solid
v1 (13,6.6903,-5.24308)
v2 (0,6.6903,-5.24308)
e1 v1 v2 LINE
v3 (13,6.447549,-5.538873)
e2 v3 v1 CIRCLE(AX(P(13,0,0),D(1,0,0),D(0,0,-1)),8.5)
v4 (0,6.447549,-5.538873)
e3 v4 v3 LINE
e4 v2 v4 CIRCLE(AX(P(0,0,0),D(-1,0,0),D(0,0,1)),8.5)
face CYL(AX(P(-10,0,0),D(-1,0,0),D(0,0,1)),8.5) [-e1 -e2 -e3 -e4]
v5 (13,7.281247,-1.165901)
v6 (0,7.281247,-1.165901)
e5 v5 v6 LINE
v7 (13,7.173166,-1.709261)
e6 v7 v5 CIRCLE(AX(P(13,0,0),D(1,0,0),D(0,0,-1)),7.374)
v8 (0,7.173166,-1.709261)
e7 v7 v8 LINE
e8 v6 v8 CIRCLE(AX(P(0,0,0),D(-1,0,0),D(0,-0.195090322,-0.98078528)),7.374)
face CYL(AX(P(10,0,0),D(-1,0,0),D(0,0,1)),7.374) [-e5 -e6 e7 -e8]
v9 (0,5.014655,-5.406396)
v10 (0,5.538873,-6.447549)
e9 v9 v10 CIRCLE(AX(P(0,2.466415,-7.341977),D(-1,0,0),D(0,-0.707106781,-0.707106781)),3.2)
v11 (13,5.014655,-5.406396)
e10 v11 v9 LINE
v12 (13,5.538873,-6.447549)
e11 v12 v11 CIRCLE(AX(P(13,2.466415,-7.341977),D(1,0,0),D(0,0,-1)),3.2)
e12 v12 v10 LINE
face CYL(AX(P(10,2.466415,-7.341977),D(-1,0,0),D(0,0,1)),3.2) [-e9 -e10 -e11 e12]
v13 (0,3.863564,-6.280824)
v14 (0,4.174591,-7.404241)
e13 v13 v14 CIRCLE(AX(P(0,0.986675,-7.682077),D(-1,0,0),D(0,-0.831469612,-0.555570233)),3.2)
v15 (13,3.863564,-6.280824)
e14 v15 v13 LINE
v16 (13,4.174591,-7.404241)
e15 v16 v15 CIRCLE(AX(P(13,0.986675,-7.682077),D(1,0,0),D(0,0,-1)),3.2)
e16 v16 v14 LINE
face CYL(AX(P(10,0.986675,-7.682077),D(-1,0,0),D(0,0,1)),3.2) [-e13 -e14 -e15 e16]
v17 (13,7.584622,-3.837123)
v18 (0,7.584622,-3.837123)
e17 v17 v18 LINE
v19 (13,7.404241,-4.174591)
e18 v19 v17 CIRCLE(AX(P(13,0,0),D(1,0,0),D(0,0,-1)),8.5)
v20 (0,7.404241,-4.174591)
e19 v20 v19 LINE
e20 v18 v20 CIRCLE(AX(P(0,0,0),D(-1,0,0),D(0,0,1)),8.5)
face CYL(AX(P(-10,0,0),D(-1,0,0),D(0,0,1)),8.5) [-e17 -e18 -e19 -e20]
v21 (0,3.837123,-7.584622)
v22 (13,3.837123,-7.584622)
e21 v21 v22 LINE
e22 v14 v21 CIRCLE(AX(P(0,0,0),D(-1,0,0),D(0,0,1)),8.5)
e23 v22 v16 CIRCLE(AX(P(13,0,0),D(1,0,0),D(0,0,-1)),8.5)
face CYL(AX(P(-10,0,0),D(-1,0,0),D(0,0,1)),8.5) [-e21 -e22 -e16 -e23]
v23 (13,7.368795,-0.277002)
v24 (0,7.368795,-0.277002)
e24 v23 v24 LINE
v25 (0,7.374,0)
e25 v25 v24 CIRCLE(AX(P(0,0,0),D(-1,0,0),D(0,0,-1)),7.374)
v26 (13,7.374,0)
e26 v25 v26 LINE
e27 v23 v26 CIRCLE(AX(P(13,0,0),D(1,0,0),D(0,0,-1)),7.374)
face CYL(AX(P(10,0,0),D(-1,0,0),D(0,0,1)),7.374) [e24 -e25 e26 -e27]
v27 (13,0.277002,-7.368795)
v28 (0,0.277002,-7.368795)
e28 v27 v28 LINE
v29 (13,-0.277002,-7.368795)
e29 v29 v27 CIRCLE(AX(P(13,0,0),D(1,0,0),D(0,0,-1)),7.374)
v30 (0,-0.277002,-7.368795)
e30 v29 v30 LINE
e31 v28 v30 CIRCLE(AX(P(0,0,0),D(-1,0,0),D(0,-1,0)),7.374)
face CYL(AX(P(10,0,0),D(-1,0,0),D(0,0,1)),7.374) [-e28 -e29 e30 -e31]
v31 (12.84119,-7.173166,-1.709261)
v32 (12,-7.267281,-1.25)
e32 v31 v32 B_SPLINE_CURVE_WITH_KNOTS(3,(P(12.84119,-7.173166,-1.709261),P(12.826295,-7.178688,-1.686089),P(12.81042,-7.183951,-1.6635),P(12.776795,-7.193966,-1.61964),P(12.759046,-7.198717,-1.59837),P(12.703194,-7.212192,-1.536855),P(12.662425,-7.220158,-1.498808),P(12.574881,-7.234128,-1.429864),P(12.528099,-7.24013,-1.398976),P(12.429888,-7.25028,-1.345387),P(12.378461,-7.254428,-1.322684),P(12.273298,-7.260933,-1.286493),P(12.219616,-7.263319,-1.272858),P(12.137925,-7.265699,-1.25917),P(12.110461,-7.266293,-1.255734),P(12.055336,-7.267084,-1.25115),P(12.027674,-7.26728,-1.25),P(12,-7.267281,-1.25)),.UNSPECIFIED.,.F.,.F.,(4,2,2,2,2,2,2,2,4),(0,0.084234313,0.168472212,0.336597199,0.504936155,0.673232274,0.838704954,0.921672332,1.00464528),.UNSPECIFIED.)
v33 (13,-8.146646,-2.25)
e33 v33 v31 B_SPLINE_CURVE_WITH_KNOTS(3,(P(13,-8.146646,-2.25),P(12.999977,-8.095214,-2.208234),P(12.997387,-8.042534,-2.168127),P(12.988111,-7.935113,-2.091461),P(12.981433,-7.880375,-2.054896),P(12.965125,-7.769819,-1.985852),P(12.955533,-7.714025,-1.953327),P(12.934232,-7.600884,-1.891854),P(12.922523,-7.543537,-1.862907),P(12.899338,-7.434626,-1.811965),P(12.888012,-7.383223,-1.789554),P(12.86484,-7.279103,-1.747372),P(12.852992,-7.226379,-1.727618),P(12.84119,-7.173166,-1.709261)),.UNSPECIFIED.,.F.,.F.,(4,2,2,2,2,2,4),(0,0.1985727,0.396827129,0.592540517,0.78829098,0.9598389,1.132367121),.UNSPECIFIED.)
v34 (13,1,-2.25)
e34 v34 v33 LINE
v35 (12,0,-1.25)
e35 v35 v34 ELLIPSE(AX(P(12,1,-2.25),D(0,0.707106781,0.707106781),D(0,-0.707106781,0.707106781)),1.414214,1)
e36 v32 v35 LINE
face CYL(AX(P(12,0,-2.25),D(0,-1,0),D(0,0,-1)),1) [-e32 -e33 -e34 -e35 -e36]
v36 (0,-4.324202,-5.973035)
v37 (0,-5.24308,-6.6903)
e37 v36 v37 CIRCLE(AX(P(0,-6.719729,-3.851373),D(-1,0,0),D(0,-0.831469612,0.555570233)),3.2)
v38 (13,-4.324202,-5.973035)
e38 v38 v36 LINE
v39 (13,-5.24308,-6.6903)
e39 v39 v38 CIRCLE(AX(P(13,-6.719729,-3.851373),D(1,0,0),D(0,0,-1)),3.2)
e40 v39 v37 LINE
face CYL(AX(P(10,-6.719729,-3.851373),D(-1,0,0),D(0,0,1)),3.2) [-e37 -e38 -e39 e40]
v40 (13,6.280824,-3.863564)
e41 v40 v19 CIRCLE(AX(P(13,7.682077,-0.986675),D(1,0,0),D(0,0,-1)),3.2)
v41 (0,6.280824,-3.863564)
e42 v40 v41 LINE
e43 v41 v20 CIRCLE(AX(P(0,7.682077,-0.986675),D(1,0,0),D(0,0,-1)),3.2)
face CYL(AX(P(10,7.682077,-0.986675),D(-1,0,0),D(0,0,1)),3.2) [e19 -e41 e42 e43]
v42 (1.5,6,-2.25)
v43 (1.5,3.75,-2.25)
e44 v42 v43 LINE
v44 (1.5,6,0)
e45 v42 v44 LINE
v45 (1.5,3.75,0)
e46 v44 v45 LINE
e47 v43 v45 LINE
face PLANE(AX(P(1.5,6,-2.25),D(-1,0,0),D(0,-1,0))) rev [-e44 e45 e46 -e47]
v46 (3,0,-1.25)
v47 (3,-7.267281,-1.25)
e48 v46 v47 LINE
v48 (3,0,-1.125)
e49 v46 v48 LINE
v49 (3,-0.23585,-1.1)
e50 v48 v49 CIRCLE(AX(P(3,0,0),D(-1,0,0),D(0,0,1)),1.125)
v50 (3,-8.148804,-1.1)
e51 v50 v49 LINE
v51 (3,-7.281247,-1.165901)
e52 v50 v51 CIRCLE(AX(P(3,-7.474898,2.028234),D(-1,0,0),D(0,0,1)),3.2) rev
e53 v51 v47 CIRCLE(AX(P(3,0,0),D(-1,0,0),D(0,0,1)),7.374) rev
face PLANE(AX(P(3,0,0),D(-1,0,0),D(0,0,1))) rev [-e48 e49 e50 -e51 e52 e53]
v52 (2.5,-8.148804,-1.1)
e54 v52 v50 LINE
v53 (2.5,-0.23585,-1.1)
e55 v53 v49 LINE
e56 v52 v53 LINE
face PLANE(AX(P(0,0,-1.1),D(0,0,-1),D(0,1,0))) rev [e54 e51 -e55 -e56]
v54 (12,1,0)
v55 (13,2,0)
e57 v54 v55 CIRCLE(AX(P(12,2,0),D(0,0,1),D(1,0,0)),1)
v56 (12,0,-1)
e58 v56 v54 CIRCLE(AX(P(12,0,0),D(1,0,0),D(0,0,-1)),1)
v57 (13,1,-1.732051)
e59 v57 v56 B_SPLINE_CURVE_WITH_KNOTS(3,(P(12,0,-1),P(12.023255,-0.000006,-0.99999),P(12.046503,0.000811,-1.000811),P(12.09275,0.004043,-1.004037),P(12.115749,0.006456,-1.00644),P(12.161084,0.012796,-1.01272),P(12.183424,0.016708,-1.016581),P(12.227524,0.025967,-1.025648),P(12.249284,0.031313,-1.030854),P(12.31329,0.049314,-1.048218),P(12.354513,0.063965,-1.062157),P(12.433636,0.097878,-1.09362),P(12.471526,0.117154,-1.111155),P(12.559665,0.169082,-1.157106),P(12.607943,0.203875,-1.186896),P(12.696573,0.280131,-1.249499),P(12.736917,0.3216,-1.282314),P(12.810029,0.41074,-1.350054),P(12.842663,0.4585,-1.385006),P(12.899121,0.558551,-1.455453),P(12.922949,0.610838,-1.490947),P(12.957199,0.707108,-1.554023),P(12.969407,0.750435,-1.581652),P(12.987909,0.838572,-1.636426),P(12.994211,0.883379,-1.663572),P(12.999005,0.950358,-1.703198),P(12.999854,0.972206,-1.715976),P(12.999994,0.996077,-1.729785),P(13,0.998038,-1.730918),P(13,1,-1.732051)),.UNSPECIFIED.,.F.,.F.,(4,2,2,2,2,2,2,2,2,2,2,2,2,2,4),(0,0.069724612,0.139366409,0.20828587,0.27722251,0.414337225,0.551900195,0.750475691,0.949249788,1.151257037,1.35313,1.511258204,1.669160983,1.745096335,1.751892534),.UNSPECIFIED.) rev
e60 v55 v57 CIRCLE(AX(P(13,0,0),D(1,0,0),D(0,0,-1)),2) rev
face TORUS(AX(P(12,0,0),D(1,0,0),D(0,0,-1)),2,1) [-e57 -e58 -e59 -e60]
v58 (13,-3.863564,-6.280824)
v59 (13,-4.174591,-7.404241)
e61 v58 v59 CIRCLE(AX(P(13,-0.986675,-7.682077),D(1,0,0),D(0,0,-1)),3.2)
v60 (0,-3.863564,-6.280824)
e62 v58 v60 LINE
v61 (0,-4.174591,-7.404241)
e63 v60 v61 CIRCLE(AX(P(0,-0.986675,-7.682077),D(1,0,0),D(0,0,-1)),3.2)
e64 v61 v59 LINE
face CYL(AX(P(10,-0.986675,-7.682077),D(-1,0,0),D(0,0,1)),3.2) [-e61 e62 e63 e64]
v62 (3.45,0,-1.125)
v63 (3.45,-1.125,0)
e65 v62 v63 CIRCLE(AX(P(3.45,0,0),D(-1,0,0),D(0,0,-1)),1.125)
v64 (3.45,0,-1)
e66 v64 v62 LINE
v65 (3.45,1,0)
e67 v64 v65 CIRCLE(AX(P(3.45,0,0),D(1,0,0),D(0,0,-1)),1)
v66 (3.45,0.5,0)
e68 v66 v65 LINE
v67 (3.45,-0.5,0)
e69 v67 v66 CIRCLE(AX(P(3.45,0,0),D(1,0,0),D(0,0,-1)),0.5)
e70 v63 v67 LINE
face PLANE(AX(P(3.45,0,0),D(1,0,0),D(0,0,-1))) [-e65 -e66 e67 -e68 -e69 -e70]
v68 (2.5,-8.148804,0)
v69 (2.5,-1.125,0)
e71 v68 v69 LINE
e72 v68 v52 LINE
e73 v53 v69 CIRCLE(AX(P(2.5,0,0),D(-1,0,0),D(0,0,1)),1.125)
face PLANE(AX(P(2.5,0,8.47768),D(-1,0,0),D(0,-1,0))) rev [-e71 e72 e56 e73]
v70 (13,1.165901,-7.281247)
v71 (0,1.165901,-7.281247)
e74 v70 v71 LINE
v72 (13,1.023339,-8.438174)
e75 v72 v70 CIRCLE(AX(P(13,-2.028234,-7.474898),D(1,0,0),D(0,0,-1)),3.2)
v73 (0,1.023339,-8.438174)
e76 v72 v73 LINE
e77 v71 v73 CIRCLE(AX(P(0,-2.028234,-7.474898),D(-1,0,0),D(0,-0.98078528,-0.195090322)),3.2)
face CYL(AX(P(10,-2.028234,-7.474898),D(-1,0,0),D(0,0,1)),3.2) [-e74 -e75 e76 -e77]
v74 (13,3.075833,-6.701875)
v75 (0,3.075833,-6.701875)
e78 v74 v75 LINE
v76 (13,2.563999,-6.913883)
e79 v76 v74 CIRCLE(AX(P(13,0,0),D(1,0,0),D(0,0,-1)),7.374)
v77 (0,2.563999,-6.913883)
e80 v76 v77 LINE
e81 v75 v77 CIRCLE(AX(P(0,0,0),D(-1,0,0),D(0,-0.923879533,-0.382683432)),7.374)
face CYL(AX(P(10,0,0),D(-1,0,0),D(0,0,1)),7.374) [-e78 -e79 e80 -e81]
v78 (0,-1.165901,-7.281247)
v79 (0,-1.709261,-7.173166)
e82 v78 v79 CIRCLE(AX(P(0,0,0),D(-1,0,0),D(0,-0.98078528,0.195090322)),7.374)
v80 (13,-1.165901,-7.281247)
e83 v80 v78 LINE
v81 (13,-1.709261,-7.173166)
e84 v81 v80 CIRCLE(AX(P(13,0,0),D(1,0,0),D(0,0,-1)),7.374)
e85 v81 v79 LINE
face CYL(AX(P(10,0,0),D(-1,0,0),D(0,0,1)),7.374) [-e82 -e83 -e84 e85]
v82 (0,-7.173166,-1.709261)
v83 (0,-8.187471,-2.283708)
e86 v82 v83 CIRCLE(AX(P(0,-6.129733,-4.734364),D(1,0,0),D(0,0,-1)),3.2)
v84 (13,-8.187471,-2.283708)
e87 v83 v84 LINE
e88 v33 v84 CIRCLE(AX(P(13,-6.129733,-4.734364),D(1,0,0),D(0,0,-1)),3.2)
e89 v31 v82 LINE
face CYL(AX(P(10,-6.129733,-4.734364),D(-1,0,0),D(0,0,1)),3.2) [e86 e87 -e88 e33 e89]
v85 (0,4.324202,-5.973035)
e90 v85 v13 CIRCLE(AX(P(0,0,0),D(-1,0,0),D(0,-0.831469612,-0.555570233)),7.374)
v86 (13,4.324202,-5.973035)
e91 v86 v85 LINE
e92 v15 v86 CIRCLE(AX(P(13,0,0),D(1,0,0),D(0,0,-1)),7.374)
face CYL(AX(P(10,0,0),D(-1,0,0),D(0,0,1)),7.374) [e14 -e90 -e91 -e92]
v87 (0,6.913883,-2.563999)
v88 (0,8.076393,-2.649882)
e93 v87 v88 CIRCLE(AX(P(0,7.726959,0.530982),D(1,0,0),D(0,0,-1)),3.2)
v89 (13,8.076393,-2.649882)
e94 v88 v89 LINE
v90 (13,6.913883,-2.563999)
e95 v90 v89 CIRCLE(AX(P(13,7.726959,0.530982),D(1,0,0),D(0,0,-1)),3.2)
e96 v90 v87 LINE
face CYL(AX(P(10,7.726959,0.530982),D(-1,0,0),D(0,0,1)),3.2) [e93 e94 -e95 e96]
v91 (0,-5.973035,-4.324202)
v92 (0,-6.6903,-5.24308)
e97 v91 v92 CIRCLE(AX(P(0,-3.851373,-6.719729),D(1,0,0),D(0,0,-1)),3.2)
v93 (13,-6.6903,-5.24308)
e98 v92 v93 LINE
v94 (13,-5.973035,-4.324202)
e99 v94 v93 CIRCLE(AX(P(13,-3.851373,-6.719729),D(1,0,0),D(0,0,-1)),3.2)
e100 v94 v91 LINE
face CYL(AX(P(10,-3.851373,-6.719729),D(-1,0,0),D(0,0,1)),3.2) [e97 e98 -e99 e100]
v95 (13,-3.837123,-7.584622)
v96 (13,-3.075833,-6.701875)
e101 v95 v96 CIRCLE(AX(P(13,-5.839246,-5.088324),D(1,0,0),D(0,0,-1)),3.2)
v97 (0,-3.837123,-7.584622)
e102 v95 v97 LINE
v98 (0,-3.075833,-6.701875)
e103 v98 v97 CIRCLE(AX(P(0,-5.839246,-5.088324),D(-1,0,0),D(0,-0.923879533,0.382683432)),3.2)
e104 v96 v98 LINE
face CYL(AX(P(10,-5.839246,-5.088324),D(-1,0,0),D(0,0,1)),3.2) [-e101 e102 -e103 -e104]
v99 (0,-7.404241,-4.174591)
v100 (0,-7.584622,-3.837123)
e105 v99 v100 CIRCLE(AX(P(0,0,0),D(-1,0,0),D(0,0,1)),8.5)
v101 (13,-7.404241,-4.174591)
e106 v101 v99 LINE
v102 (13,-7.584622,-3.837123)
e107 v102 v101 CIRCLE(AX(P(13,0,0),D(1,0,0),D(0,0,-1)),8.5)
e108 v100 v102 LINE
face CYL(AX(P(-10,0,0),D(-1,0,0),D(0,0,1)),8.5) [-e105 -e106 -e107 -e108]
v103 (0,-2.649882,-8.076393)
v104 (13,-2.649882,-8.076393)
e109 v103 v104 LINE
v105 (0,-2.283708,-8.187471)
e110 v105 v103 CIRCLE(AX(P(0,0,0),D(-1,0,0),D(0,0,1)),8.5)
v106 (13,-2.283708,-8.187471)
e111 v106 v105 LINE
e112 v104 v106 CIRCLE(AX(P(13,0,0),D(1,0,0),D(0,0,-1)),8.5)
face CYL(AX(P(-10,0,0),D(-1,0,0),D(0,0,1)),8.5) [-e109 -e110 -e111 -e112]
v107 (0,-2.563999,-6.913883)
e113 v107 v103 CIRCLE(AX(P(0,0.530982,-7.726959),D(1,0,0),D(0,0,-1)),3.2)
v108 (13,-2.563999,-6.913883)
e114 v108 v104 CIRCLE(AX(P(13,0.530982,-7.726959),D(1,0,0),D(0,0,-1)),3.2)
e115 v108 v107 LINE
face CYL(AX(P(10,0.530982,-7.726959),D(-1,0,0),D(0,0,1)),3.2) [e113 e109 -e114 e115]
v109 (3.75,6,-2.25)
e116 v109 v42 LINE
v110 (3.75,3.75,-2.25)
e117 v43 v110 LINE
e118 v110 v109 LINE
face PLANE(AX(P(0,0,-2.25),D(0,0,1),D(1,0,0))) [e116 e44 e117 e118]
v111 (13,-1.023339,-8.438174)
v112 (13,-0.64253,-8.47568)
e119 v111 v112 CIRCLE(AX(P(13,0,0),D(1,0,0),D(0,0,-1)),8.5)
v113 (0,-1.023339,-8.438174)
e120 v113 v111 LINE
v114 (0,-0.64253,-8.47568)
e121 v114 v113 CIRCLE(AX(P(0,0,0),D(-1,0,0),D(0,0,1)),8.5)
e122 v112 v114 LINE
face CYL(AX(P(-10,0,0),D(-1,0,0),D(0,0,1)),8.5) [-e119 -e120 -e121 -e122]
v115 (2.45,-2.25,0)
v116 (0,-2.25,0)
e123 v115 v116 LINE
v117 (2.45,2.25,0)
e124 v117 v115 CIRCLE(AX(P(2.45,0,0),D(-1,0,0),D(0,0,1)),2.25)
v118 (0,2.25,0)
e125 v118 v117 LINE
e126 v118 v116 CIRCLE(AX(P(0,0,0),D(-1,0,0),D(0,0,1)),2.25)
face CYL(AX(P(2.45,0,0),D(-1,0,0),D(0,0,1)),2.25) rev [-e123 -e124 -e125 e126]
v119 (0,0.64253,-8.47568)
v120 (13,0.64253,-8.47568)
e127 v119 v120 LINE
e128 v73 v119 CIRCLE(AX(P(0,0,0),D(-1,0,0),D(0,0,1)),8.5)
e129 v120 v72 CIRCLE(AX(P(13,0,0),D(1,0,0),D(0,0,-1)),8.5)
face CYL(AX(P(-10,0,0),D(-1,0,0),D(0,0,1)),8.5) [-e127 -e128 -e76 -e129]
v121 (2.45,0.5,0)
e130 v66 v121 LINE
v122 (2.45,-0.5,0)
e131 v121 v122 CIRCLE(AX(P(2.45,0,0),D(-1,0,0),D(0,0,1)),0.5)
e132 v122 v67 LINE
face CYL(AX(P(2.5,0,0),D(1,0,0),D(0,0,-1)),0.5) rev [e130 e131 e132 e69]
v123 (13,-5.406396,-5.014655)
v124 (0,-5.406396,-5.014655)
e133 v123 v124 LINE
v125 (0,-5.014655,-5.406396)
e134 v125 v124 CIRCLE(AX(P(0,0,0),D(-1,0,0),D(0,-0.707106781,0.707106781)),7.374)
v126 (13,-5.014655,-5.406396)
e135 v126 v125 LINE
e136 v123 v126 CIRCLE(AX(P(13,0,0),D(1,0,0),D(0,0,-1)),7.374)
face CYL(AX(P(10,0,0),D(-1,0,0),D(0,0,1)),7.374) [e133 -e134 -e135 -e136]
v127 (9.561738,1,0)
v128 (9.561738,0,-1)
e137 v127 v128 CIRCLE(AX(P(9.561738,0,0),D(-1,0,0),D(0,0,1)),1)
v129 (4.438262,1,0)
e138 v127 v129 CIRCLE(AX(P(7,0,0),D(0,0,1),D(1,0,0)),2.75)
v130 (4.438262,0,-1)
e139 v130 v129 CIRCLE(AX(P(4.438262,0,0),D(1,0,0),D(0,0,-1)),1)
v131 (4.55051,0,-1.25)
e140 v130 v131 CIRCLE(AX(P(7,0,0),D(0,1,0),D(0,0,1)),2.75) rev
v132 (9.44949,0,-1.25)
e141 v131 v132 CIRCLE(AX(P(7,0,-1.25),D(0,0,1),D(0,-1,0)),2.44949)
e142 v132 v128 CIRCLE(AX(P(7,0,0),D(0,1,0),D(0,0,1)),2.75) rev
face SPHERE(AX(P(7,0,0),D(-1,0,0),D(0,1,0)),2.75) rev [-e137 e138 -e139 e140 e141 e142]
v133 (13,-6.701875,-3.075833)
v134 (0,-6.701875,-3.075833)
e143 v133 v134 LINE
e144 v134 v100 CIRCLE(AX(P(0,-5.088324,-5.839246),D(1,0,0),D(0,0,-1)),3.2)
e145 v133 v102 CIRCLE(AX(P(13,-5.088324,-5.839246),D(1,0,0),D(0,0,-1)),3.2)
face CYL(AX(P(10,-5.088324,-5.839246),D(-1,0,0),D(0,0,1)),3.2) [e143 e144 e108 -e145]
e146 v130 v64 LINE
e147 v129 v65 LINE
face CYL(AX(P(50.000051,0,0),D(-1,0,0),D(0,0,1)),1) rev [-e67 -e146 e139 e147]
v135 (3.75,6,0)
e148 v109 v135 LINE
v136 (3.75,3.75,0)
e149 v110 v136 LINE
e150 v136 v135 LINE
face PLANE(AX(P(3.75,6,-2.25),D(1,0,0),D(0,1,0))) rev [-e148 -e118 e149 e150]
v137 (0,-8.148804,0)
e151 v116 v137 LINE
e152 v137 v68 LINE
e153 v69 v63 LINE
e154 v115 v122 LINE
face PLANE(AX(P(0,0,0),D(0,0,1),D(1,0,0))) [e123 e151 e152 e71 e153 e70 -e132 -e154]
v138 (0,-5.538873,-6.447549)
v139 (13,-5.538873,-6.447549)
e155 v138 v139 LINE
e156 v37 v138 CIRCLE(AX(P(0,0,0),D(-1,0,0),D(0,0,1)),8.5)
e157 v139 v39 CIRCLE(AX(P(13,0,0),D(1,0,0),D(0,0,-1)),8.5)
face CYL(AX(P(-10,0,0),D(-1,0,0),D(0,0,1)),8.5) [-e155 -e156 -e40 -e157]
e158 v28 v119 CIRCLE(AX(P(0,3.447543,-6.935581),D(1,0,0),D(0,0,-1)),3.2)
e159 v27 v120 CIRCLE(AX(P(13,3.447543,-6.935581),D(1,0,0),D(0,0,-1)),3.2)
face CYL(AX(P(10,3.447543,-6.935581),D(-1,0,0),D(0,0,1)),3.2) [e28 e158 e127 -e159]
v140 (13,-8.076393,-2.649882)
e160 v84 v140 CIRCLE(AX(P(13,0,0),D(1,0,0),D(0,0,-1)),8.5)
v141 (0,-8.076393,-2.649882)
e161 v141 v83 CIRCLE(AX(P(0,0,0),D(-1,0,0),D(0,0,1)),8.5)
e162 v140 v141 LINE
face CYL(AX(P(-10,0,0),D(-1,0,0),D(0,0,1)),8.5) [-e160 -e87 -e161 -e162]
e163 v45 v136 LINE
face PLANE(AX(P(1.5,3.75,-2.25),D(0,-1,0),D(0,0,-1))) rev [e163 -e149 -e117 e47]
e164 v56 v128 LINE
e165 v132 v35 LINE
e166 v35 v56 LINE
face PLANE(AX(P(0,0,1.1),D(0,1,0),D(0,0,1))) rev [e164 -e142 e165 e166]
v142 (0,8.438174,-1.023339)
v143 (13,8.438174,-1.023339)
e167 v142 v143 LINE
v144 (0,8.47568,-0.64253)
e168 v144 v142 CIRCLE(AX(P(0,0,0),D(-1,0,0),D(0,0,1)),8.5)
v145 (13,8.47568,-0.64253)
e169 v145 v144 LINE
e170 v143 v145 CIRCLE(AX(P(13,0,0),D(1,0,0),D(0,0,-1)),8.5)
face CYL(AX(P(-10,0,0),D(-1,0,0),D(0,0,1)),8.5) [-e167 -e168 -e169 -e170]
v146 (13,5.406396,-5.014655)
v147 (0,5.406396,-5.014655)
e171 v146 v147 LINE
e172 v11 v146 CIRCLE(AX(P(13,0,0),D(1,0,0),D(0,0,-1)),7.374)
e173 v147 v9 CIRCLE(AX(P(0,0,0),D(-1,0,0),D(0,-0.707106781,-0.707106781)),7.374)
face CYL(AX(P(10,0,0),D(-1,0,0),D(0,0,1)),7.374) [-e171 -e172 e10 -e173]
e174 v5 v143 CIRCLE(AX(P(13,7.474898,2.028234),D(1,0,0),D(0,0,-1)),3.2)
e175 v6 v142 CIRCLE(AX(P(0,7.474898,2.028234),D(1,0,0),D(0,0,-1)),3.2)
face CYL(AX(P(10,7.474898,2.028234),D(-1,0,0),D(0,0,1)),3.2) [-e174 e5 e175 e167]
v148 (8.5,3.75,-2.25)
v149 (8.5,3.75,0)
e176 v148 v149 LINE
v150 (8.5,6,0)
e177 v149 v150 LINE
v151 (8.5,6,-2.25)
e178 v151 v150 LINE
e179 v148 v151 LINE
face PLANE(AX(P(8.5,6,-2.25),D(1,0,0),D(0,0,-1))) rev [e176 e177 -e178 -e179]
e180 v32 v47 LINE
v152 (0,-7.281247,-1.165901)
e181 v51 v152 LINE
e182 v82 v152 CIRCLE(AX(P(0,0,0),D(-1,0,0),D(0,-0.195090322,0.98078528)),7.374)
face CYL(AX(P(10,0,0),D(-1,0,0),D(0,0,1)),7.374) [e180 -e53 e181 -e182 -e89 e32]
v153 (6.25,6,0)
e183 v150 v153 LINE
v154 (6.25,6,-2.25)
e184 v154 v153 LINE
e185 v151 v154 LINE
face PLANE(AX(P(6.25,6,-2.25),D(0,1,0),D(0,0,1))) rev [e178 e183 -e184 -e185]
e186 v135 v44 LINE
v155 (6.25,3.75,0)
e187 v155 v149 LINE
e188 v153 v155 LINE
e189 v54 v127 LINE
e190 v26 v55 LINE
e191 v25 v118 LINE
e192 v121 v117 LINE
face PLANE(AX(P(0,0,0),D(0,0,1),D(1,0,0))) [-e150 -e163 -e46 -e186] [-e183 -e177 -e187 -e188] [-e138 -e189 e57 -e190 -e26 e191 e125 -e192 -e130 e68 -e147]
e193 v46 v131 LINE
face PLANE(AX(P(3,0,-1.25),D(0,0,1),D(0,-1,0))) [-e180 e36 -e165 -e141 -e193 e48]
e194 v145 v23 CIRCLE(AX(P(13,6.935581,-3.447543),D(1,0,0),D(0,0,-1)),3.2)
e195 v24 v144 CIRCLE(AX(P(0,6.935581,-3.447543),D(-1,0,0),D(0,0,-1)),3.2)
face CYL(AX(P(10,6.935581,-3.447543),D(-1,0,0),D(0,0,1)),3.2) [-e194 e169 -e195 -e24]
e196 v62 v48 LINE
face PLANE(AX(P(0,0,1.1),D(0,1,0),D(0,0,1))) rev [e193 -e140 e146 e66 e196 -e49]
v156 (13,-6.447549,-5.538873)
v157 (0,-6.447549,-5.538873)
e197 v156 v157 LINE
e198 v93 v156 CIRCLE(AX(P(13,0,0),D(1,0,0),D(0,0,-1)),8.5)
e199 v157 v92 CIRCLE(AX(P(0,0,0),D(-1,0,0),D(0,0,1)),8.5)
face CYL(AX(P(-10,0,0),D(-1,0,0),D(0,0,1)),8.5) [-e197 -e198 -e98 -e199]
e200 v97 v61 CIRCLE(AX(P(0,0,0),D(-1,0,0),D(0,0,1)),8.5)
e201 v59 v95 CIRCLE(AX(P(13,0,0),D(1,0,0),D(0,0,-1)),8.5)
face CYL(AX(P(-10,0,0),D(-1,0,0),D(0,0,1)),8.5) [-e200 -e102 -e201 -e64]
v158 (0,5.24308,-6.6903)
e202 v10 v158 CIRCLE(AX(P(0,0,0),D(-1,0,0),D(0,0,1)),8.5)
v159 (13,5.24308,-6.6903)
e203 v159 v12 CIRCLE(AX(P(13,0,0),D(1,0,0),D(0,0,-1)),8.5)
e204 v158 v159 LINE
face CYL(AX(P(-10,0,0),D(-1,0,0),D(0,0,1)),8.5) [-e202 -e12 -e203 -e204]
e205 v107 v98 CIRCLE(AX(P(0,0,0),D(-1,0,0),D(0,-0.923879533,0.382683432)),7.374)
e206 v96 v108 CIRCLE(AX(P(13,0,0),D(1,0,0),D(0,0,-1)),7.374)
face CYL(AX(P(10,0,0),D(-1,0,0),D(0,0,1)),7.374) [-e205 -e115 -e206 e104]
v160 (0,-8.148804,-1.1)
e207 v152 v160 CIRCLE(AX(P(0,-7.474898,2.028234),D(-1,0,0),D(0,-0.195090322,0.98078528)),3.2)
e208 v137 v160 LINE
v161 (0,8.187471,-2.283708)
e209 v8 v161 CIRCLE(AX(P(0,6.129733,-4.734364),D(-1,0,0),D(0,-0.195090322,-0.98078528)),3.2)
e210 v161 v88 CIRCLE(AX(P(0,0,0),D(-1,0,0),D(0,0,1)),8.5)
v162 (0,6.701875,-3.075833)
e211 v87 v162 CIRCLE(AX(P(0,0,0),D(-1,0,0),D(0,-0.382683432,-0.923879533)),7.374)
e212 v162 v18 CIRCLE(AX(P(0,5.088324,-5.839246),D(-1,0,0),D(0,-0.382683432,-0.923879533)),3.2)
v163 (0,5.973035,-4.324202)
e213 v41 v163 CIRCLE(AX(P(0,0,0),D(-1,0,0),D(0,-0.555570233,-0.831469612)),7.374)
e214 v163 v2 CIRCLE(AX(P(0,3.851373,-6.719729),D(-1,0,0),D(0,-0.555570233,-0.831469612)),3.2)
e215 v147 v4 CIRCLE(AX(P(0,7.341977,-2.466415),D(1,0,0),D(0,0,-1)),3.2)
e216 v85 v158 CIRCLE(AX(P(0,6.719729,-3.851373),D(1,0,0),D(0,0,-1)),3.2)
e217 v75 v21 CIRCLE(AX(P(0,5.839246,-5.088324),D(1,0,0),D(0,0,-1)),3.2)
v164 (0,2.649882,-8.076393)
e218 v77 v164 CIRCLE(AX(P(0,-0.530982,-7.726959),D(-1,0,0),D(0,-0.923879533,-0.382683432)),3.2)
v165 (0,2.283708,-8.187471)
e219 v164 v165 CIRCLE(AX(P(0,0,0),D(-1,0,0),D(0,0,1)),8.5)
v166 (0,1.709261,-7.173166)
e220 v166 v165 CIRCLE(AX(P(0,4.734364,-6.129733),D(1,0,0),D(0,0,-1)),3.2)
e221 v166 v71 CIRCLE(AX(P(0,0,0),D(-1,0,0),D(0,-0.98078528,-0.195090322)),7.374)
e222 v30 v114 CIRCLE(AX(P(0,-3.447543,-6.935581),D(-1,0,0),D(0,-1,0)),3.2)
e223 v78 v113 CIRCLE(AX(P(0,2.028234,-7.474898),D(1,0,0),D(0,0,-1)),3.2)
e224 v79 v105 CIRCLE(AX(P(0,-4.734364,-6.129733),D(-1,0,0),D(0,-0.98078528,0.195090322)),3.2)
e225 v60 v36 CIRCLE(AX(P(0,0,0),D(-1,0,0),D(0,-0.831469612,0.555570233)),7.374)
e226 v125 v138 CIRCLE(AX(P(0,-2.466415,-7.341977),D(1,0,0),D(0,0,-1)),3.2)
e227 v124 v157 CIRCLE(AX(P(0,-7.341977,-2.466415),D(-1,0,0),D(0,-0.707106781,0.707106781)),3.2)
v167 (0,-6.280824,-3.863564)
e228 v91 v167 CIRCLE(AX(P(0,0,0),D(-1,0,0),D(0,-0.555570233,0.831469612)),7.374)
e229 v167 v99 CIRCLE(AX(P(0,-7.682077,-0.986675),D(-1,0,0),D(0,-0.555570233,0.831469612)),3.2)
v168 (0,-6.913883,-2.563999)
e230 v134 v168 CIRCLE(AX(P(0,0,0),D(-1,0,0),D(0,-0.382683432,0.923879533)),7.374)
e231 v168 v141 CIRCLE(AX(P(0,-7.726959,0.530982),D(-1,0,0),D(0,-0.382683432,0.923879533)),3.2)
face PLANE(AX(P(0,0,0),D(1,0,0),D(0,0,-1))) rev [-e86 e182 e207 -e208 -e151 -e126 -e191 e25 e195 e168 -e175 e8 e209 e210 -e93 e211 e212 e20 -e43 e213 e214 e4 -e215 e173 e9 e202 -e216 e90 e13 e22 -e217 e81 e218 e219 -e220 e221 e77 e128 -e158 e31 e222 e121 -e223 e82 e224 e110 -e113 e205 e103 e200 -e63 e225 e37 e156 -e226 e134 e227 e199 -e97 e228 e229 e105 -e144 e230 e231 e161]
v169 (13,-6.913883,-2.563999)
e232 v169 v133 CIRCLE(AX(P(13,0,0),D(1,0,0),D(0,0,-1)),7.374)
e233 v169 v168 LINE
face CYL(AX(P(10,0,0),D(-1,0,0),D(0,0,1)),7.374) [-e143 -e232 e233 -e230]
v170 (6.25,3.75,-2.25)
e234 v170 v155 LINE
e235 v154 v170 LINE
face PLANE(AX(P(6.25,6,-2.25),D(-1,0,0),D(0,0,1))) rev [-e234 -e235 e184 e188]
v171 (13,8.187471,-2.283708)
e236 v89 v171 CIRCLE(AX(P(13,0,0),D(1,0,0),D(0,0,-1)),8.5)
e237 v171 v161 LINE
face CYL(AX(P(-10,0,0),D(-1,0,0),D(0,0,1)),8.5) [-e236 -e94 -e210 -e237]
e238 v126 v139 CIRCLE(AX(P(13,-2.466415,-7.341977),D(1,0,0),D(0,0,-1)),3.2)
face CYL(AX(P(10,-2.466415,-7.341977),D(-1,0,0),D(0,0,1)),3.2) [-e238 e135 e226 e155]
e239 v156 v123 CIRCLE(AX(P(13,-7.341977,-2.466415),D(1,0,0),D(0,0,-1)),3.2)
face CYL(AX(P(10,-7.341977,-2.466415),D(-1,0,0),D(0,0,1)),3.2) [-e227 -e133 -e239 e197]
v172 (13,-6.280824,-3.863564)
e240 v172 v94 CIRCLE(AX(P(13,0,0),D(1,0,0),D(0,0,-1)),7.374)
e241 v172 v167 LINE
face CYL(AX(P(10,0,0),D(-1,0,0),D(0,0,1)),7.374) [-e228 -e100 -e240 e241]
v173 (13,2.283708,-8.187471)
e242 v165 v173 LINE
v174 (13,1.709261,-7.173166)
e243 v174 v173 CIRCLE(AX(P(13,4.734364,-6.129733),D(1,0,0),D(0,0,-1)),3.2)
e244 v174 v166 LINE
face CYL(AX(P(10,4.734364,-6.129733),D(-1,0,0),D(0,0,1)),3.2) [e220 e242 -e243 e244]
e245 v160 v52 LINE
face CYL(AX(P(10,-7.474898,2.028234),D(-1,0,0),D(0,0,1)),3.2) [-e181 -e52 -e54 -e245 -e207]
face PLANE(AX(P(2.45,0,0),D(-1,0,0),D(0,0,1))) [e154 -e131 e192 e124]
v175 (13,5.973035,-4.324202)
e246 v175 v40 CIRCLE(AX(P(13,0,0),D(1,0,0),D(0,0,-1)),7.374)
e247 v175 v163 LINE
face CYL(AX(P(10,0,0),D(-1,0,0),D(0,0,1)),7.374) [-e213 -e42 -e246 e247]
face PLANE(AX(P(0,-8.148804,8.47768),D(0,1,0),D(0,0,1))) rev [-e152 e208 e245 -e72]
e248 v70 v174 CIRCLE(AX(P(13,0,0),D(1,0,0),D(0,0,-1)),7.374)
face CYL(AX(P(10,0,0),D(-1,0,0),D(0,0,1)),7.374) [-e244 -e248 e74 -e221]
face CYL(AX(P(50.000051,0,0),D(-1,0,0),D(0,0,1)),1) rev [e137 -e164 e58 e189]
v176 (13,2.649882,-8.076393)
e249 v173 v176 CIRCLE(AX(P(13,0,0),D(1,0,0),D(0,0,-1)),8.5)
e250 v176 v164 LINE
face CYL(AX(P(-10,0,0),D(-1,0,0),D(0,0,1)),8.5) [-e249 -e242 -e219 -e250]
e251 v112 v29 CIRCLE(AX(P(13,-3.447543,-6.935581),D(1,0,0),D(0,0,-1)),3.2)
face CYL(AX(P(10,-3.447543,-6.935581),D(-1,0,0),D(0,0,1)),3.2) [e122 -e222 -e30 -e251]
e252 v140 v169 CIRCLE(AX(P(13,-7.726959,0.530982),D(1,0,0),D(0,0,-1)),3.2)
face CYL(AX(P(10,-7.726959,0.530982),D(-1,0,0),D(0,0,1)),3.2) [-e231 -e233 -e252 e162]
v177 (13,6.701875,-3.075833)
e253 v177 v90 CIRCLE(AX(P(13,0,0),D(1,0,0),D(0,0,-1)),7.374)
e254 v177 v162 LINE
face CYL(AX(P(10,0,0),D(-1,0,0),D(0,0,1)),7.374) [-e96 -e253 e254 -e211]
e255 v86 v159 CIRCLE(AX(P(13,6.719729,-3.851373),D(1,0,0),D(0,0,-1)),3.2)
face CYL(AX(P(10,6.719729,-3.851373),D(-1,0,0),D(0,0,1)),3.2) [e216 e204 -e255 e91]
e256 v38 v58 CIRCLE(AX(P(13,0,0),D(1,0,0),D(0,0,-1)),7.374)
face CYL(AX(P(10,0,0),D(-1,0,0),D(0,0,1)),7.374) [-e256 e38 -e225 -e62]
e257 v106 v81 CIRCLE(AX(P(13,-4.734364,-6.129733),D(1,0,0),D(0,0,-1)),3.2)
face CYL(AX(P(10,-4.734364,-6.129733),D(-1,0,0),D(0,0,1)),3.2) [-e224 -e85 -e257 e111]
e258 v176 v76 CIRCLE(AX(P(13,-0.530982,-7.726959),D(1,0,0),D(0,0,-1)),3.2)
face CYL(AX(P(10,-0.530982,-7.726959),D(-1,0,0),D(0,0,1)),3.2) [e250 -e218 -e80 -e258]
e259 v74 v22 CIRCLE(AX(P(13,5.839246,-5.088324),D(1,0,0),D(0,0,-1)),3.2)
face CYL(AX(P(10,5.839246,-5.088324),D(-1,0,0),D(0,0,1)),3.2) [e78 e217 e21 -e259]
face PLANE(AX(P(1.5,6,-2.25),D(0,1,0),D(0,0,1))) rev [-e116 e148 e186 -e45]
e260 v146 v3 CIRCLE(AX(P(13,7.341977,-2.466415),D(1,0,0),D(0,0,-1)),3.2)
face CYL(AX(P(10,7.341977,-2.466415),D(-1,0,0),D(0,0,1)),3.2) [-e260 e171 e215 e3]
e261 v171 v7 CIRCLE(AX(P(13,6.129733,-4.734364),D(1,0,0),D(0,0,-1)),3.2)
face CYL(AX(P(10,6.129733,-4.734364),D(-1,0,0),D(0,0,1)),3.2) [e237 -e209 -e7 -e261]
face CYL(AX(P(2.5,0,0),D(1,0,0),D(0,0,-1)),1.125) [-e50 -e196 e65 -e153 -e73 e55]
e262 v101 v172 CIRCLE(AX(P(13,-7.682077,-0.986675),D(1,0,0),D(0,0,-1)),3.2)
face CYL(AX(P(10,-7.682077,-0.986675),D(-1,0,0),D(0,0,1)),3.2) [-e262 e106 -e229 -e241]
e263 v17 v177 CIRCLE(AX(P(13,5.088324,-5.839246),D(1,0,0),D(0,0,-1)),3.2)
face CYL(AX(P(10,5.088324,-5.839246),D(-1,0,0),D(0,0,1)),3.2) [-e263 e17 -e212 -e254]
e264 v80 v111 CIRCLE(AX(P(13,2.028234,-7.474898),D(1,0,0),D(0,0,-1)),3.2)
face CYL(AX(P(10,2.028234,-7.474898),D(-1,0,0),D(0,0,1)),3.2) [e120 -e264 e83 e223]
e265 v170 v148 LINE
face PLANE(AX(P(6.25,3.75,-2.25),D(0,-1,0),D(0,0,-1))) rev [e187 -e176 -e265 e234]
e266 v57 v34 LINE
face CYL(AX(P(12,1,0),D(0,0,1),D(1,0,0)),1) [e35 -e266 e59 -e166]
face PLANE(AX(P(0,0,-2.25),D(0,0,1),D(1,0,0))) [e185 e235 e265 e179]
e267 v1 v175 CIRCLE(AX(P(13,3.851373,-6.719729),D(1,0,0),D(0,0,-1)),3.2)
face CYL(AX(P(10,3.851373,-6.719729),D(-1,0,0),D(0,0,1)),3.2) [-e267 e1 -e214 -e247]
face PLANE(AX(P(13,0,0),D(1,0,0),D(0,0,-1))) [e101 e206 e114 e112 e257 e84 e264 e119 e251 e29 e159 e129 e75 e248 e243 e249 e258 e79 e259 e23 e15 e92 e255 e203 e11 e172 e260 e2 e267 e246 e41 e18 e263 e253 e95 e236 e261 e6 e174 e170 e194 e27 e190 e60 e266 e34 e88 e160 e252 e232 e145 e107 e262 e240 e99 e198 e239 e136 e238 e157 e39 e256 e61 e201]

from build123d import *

# Parameters (mm, degrees)
BASPROSKE_W         = 10
BASPROSKE_H         = 8.5
TOOTHCUT_DEPTH      = 16.636495771
TEETHCUTS_COUNT     = 32
TEETHCUTS_ANGLE     = 348.75
BORSKE_R            = 1
BORE_DEPTH          = 50.0000508
SKETCH1_W           = 2.2
SKETCH1_H           = 12
CUT_EXTRUDE1_DEPTH  = 16.610070769
SKETCH4_R           = 1.125
SKETCH4_R_2         = 0.5
BOSS_EXTRUDE1_DEPTH = 0.5
BOSS_EXTRUDE2_REACH = 18.234
SKETCH5_W           = 2.5
SKETCH5_H           = 8.148803967
SKETCH6_R           = 2.25
CUT_EXTRUDE4_DEPTH  = 2.45
SKETCH7_R           = 0.5
CUT_EXTRUDE5_DEPTH  = 2.4
SKETCH8_W           = 11.062945953
SKETCH8_H           = 17.798852561
CUT_EXTRUDE7_DEPTH  = 10
SKETCH9_W           = 2.25
SKETCH9_H           = 2.25
CUT_EXTRUDE8_DEPTH  = 2.25
SKETCH10_W          = 1.25
SKETCH10_H          = 9
CUT_EXTRUDE10_DEPTH = 7
BOSS_EXTRUDE3_REACH = 18.961
BOSS_EXTRUDE4_DEPTH = 1.25
BOSS_EXTRUDE5_START = -1
BOSS_EXTRUDE5_DEPTH = 1
FILLET1_R           = 1


with BuildPart() as part:
    # BasProSke → Base-Revolve (revolve)
    with BuildSketch(Plane(origin=(0, 0, 0), x_dir=(1, 0, 0), z_dir=(0, 1, 0)), mode=Mode.PRIVATE) as base_revolve_sk:
        with Locations((5, 4.25)):
            Rectangle(BASPROSKE_W, BASPROSKE_H)
    revolve(base_revolve_sk.sketch.rotate(Axis((-10, 0, 0), (1, 0, 0)), 180), axis=Axis((-10, 0, 0), (1, 0, 0)))

    # TooCutSke → ToothCut (cut, through all)
    with BuildSketch(Plane(origin=(0, 0, 0), x_dir=(0, 0, -1), z_dir=(1, 0, 0))):
        with BuildLine():
            ThreePointArc((0.277002447, 7.3687954), (0, 7.374), (-0.277002447, 7.3687954))
            ThreePointArc((-0.277002447, 7.3687954), (-0.41335061, 7.952280695), (-0.656086882, 8.500117362))
            ThreePointArc((-0.656086882, 8.500117362), (0, 8.5254), (0.656086882, 8.500117362))
            ThreePointArc((0.656086882, 8.500117362), (0.41335061, 7.952280695), (0.277002447, 7.3687954))
        make_face()
    toothcut = extrude(amount=TOOTHCUT_DEPTH, mode=Mode.SUBTRACT)

    # TeethCuts: ToothCut ×32 about axis
    teethcuts_axis = Axis((-10, 0, 0), (1, 0, 0))
    for i in range(1, TEETHCUTS_COUNT):
        add(toothcut.rotate(teethcuts_axis, i * TEETHCUTS_ANGLE / (TEETHCUTS_COUNT - 1)), mode=Mode.SUBTRACT)

    # BorSke → Bore (cut, symmetric)
    with BuildSketch(Plane(origin=(0, 0, 0), x_dir=(0, 0, -1), z_dir=(1, 0, 0))):
        with Locations(Location((0, 0, 0), (0, 0, 180))):
            Circle(BORSKE_R)
    extrude(amount=BORE_DEPTH, both=True, mode=Mode.SUBTRACT)

    # Sketch1 → Cut-Extrude1 (cut, through all)
    with BuildSketch(Plane(origin=(10, 0, 0), x_dir=(0, 0, -1), z_dir=(1, 0, 0))):
        with Locations((0, -6)):
            Rectangle(SKETCH1_W, SKETCH1_H)
    extrude(amount=-CUT_EXTRUDE1_DEPTH, mode=Mode.SUBTRACT)

    # Sketch2 → Cut-Revolve1 (revolve, cut)
    with BuildSketch(Plane.XY):
        with BuildLine():
            Line((4.25, 0), (9.75, 0))
            ThreePointArc((9.75, 0), (7, 2.75), (4.25, 0))
        make_face()
    revolve(axis=Axis((4.25, 0, 0), (1, 0, 0)), mode=Mode.SUBTRACT)

    # Sketch4 → Boss-Extrude1 (add)
    with BuildSketch(Plane.ZY.offset(-3)):
        Circle(SKETCH4_R)
        Circle(SKETCH4_R_2, mode=Mode.SUBTRACT)
    extrude(amount=BOSS_EXTRUDE1_DEPTH)

    # Sketch5 → Boss-Extrude2 (add, up to next)
    with BuildSketch(Plane.XY.offset(-1.1), mode=Mode.PRIVATE) as boss_extrude2_sk1:
        with Locations((1.25, -4.074401984)):
            Rectangle(SKETCH5_W, SKETCH5_H)
    boss_extrude2_tool1 = extrude(boss_extrude2_sk1.sketch, amount=BOSS_EXTRUDE2_REACH, mode=Mode.PRIVATE) - part.part
    add(boss_extrude2_tool1.solids().sort_by_distance((1.25, -4.074402, -1.1))[0])

    # Sketch6 → Cut-Extrude4 (cut)
    with BuildSketch(Plane.ZY):
        Circle(SKETCH6_R)
    extrude(amount=-CUT_EXTRUDE4_DEPTH, mode=Mode.SUBTRACT)

    # Sketch7 → Cut-Extrude5 (cut)
    with BuildSketch(Plane(origin=(2.5, 0, 0), x_dir=(0, 0, -1), z_dir=(1, 0, 0))):
        with Locations(Location((0, 0, 0), (0, 0, 180))):
            Circle(SKETCH7_R)
    extrude(amount=-CUT_EXTRUDE5_DEPTH, mode=Mode.SUBTRACT)

    # Sketch8 → Cut-Extrude7 (cut)
    with BuildSketch(Plane.XY):
        with Locations((5.022304327, 0.010278679)):
            Rectangle(SKETCH8_W, SKETCH8_H)
    extrude(amount=CUT_EXTRUDE7_DEPTH, mode=Mode.SUBTRACT)

    # Sketch9 → Cut-Extrude8 (cut)
    with BuildSketch(Plane.XY):
        with Locations((2.625, 4.875)):
            Rectangle(SKETCH9_W, SKETCH9_H)
        with Locations((7.375, 4.875)):
            Rectangle(SKETCH9_W, SKETCH9_H)
    extrude(amount=-CUT_EXTRUDE8_DEPTH, mode=Mode.SUBTRACT)

    # Sketch10 → Cut-Extrude10 (cut)
    with BuildSketch(Plane(origin=(10, 0, 0), x_dir=(0, 0, -1), z_dir=(1, 0, 0))):
        with Locations((0.625, -4.5)):
            Rectangle(SKETCH10_W, SKETCH10_H)
    extrude(amount=-CUT_EXTRUDE10_DEPTH, mode=Mode.SUBTRACT)

    # Sketch11 → Boss-Extrude3 (add, up to next)
    with BuildSketch(Plane(origin=(12, 0, 0), x_dir=(0, 0, -1), z_dir=(1, 0, 0)), mode=Mode.PRIVATE) as boss_extrude3_sk1:
        with BuildLine():
            Line((0, 1), (0, 7.374))
            ThreePointArc((0, 7.374), (0.138525669, 7.372698735), (0.277002447, 7.3687954))
            ThreePointArc((0.277002447, 7.3687954), (0.408940123, 7.939022225), (0.642530382, 8.475680191))
            ThreePointArc((0.642530382, 8.475680191), (0.833145693, 8.459070177), (1.023338837, 8.438173832))
            ThreePointArc((1.023338837, 8.438173832), (1.14774395, 7.866256399), (1.165900745, 7.281246559))
            ThreePointArc((1.165900745, 7.281246559), (1.438596035, 7.232310658), (1.70926059, 7.173165566))
            ThreePointArc((1.70926059, 7.173165566), (1.949908855, 7.706695879), (2.283707519, 8.187470914))
            ThreePointArc((2.283707519, 8.187470914), (2.467419757, 8.133992854), (2.649881718, 8.076393185))
            ThreePointArc((2.649881718, 8.076393185), (2.660320865, 7.491194752), (2.563999025, 6.913883496))
            ThreePointArc((2.563999025, 6.913883496), (2.82190763, 6.812687673), (3.075832807, 6.701875002))
            ThreePointArc((3.075832807, 6.701875002), (3.415943684, 7.178205532), (3.837123056, 7.584621721))
            ThreePointArc((3.837123056, 7.584621721), (4.006872263, 7.496330747), (4.174591131, 7.404241277))
            ThreePointArc((4.174591131, 7.404241277), (4.070663142, 6.828250691), (3.86356426, 6.280823768))
            ThreePointArc((3.86356426, 6.280823768), (4.096774898, 6.131256921), (4.324202495, 5.97303514))
            ThreePointArc((4.324202495, 5.97303514), (4.750705713, 6.373860772), (5.243080107, 6.690299769))
            ThreePointArc((5.243080107, 6.690299769), (5.392342915, 6.570588854), (5.538873348, 6.447548529))
            ThreePointArc((5.538873348, 6.447548529), (5.324572118, 5.902900785), (5.014654888, 5.406395505))
            ThreePointArc((5.014654888, 5.406395505), (5.214205404, 5.214205404), (5.406395505, 5.014654888))
            ThreePointArc((5.406395505, 5.014654888), (5.902900785, 5.324572118), (6.447548529, 5.538873348))
            ThreePointArc((6.447548529, 5.538873348), (6.570588854, 5.392342915), (6.690299769, 5.243080107))
            ThreePointArc((6.690299769, 5.243080107), (6.373860772, 4.750705713), (5.97303514, 4.324202495))
            ThreePointArc((5.97303514, 4.324202495), (6.131256921, 4.096774898), (6.280823768, 3.86356426))
            ThreePointArc((6.280823768, 3.86356426), (6.828250691, 4.070663142), (7.404241277, 4.174591131))
            ThreePointArc((7.404241277, 4.174591131), (7.496330747, 4.006872263), (7.584621721, 3.837123056))
            ThreePointArc((7.584621721, 3.837123056), (7.178205532, 3.415943684), (6.701875002, 3.075832807))
            ThreePointArc((6.701875002, 3.075832807), (6.812687673, 2.82190763), (6.913883496, 2.563999025))
            ThreePointArc((6.913883496, 2.563999025), (7.491194752, 2.660320865), (8.076393185, 2.649881718))
            ThreePointArc((8.076393185, 2.649881718), (8.133992854, 2.467419757), (8.187470914, 2.283707519))
            ThreePointArc((8.187470914, 2.283707519), (7.706695879, 1.949908855), (7.173165566, 1.70926059))
            ThreePointArc((7.173165566, 1.70926059), (7.232310658, 1.438596035), (7.281246559, 1.165900745))
            ThreePointArc((7.281246559, 1.165900745), (7.866256399, 1.14774395), (8.438173832, 1.023338837))
            ThreePointArc((8.438173832, 1.023338837), (8.459070177, 0.833145693), (8.475680191, 0.642530382))
            ThreePointArc((8.475680191, 0.642530382), (7.939022225, 0.408940123), (7.3687954, 0.277002447))
            ThreePointArc((7.3687954, 0.277002447), (7.374, 0), (7.3687954, -0.277002447))
            ThreePointArc((7.3687954, -0.277002447), (7.939022225, -0.408940123), (8.475680191, -0.642530382))
            ThreePointArc((8.475680191, -0.642530382), (8.459070177, -0.833145693), (8.438173832, -1.023338837))
            ThreePointArc((8.438173832, -1.023338837), (7.866256399, -1.14774395), (7.281246559, -1.165900745))
            ThreePointArc((7.281246559, -1.165900745), (7.232310658, -1.438596035), (7.173165566, -1.70926059))
            ThreePointArc((7.173165566, -1.70926059), (7.706695879, -1.949908855), (8.187470914, -2.283707519))
            ThreePointArc((8.187470914, -2.283707519), (8.133992854, -2.467419757), (8.076393185, -2.649881718))
            ThreePointArc((8.076393185, -2.649881718), (7.491194752, -2.660320865), (6.913883496, -2.563999025))
            ThreePointArc((6.913883496, -2.563999025), (6.812687673, -2.82190763), (6.701875002, -3.075832807))
            ThreePointArc((6.701875002, -3.075832807), (7.178205532, -3.415943684), (7.584621721, -3.837123056))
            ThreePointArc((7.584621721, -3.837123056), (7.496330747, -4.006872263), (7.404241277, -4.174591131))
            ThreePointArc((7.404241277, -4.174591131), (6.828250691, -4.070663142), (6.280823768, -3.86356426))
            ThreePointArc((6.280823768, -3.86356426), (6.131256921, -4.096774898), (5.97303514, -4.324202495))
            ThreePointArc((5.97303514, -4.324202495), (6.373860772, -4.750705713), (6.690299769, -5.243080107))
            ThreePointArc((6.690299769, -5.243080107), (6.570588854, -5.392342915), (6.447548529, -5.538873348))
            ThreePointArc((6.447548529, -5.538873348), (5.902900785, -5.324572118), (5.406395505, -5.014654888))
            ThreePointArc((5.406395505, -5.014654888), (5.214205404, -5.214205404), (5.014654888, -5.406395505))
            ThreePointArc((5.014654888, -5.406395505), (5.324572118, -5.902900785), (5.538873348, -6.447548529))
            ThreePointArc((5.538873348, -6.447548529), (5.392342915, -6.570588854), (5.243080107, -6.690299769))
            ThreePointArc((5.243080107, -6.690299769), (4.750705713, -6.373860772), (4.324202495, -5.97303514))
            ThreePointArc((4.324202495, -5.97303514), (4.096774898, -6.131256921), (3.86356426, -6.280823768))
            ThreePointArc((3.86356426, -6.280823768), (4.070663142, -6.828250691), (4.174591131, -7.404241277))
            ThreePointArc((4.174591131, -7.404241277), (4.006872263, -7.496330747), (3.837123056, -7.584621721))
            ThreePointArc((3.837123056, -7.584621721), (3.415943684, -7.178205532), (3.075832807, -6.701875002))
            ThreePointArc((3.075832807, -6.701875002), (2.82190763, -6.812687673), (2.563999025, -6.913883496))
            ThreePointArc((2.563999025, -6.913883496), (2.660320865, -7.491194752), (2.649881718, -8.076393185))
            ThreePointArc((2.649881718, -8.076393185), (2.467419757, -8.133992854), (2.283707519, -8.187470914))
            ThreePointArc((2.283707519, -8.187470914), (1.949908855, -7.706695879), (1.70926059, -7.173165566))
            ThreePointArc((1.70926059, -7.173165566), (1.480378414, -7.223874013), (1.25, -7.267281197))
            Line((1.25, -7.267281197), (1.25, 0))
            Line((1.25, 0), (1, 0))
            ThreePointArc((1, 0), (0.707106781, 0.707106781), (0, 1))
        make_face()
    boss_extrude3_tool1 = extrude(boss_extrude3_sk1.sketch, amount=-BOSS_EXTRUDE3_REACH, mode=Mode.PRIVATE) - part.part
    add(boss_extrude3_tool1.solids().sort_by_distance((12, 0.4527, -3.714882))[0])

    # Sketch14 → Boss-Extrude4 (add)
    with BuildSketch(Plane(origin=(13, 0, 0), x_dir=(0, 0, -1), z_dir=(1, 0, 0))):
        with BuildLine():
            Line((0, 7.374), (0, 1))
            ThreePointArc((0, 1), (0.707106781, 0.707106781), (1, 0))
            Line((1, 0), (1.25, 0))
            Line((1.25, 0), (1.25, -7.267281197))
            ThreePointArc((1.25, -7.267281197), (1.480378414, -7.223874013), (1.70926059, -7.173165566))
            ThreePointArc((1.70926059, -7.173165566), (1.949908855, -7.706695879), (2.283707519, -8.187470914))
            ThreePointArc((2.283707519, -8.187470914), (2.467419757, -8.133992854), (2.649881718, -8.076393185))
            ThreePointArc((2.649881718, -8.076393185), (2.660320865, -7.491194752), (2.563999025, -6.913883496))
            ThreePointArc((2.563999025, -6.913883496), (2.82190763, -6.812687673), (3.075832807, -6.701875002))
            ThreePointArc((3.075832807, -6.701875002), (3.415943684, -7.178205532), (3.837123056, -7.584621721))
            ThreePointArc((3.837123056, -7.584621721), (4.006872263, -7.496330747), (4.174591131, -7.404241277))
            ThreePointArc((4.174591131, -7.404241277), (4.070663142, -6.828250691), (3.86356426, -6.280823768))
            ThreePointArc((3.86356426, -6.280823768), (4.096774898, -6.131256921), (4.324202495, -5.97303514))
            ThreePointArc((4.324202495, -5.97303514), (4.750705713, -6.373860772), (5.243080107, -6.690299769))
            ThreePointArc((5.243080107, -6.690299769), (5.392342915, -6.570588854), (5.538873348, -6.447548529))
            ThreePointArc((5.538873348, -6.447548529), (5.324572118, -5.902900785), (5.014654888, -5.406395505))
            ThreePointArc((5.014654888, -5.406395505), (5.214205404, -5.214205404), (5.406395505, -5.014654888))
            ThreePointArc((5.406395505, -5.014654888), (5.902900785, -5.324572118), (6.447548529, -5.538873348))
            ThreePointArc((6.447548529, -5.538873348), (6.570588854, -5.392342915), (6.690299769, -5.243080107))
            ThreePointArc((6.690299769, -5.243080107), (6.373860772, -4.750705713), (5.97303514, -4.324202495))
            ThreePointArc((5.97303514, -4.324202495), (6.131256921, -4.096774898), (6.280823768, -3.86356426))
            ThreePointArc((6.280823768, -3.86356426), (6.828250691, -4.070663142), (7.404241277, -4.174591131))
            ThreePointArc((7.404241277, -4.174591131), (7.496330747, -4.006872263), (7.584621721, -3.837123056))
            ThreePointArc((7.584621721, -3.837123056), (7.178205532, -3.415943684), (6.701875002, -3.075832807))
            ThreePointArc((6.701875002, -3.075832807), (6.812687673, -2.82190763), (6.913883496, -2.563999025))
            ThreePointArc((6.913883496, -2.563999025), (7.491194752, -2.660320865), (8.076393185, -2.649881718))
            ThreePointArc((8.076393185, -2.649881718), (8.133992854, -2.467419757), (8.187470914, -2.283707519))
            ThreePointArc((8.187470914, -2.283707519), (7.706695879, -1.949908855), (7.173165566, -1.70926059))
            ThreePointArc((7.173165566, -1.70926059), (7.232310658, -1.438596035), (7.281246559, -1.165900745))
            ThreePointArc((7.281246559, -1.165900745), (7.866256399, -1.14774395), (8.438173832, -1.023338837))
            ThreePointArc((8.438173832, -1.023338837), (8.459070177, -0.833145693), (8.475680191, -0.642530382))
            ThreePointArc((8.475680191, -0.642530382), (7.939022225, -0.408940123), (7.3687954, -0.277002447))
            ThreePointArc((7.3687954, -0.277002447), (7.374, 0), (7.3687954, 0.277002447))
            ThreePointArc((7.3687954, 0.277002447), (7.939022225, 0.408940123), (8.475680191, 0.642530382))
            ThreePointArc((8.475680191, 0.642530382), (8.459070177, 0.833145693), (8.438173832, 1.023338837))
            ThreePointArc((8.438173832, 1.023338837), (7.866256399, 1.14774395), (7.281246559, 1.165900745))
            ThreePointArc((7.281246559, 1.165900745), (7.232310658, 1.438596035), (7.173165566, 1.70926059))
            ThreePointArc((7.173165566, 1.70926059), (7.706695879, 1.949908855), (8.187470914, 2.283707519))
            ThreePointArc((8.187470914, 2.283707519), (8.133992854, 2.467419757), (8.076393185, 2.649881718))
            ThreePointArc((8.076393185, 2.649881718), (7.491194752, 2.660320865), (6.913883496, 2.563999025))
            ThreePointArc((6.913883496, 2.563999025), (6.812687673, 2.82190763), (6.701875002, 3.075832807))
            ThreePointArc((6.701875002, 3.075832807), (7.178205532, 3.415943684), (7.584621721, 3.837123056))
            ThreePointArc((7.584621721, 3.837123056), (7.496330747, 4.006872263), (7.404241277, 4.174591131))
            ThreePointArc((7.404241277, 4.174591131), (6.828250691, 4.070663142), (6.280823768, 3.86356426))
            ThreePointArc((6.280823768, 3.86356426), (6.131256921, 4.096774898), (5.97303514, 4.324202495))
            ThreePointArc((5.97303514, 4.324202495), (6.373860772, 4.750705713), (6.690299769, 5.243080107))
            ThreePointArc((6.690299769, 5.243080107), (6.570588854, 5.392342915), (6.447548529, 5.538873348))
            ThreePointArc((6.447548529, 5.538873348), (5.902900785, 5.324572118), (5.406395505, 5.014654888))
            ThreePointArc((5.406395505, 5.014654888), (5.214205404, 5.214205404), (5.014654888, 5.406395505))
            ThreePointArc((5.014654888, 5.406395505), (5.324572118, 5.902900785), (5.538873348, 6.447548529))
            ThreePointArc((5.538873348, 6.447548529), (5.392342915, 6.570588854), (5.243080107, 6.690299769))
            ThreePointArc((5.243080107, 6.690299769), (4.750705713, 6.373860772), (4.324202495, 5.97303514))
            ThreePointArc((4.324202495, 5.97303514), (4.096774898, 6.131256921), (3.86356426, 6.280823768))
            ThreePointArc((3.86356426, 6.280823768), (4.070663142, 6.828250691), (4.174591131, 7.404241277))
            ThreePointArc((4.174591131, 7.404241277), (4.006872263, 7.496330747), (3.837123056, 7.584621721))
            ThreePointArc((3.837123056, 7.584621721), (3.415943684, 7.178205532), (3.075832807, 6.701875002))
            ThreePointArc((3.075832807, 6.701875002), (2.82190763, 6.812687673), (2.563999025, 6.913883496))
            ThreePointArc((2.563999025, 6.913883496), (2.660320865, 7.491194752), (2.649881718, 8.076393185))
            ThreePointArc((2.649881718, 8.076393185), (2.467419757, 8.133992854), (2.283707519, 8.187470914))
            ThreePointArc((2.283707519, 8.187470914), (1.949908855, 7.706695879), (1.70926059, 7.173165566))
            ThreePointArc((1.70926059, 7.173165566), (1.438596035, 7.232310658), (1.165900745, 7.281246559))
            ThreePointArc((1.165900745, 7.281246559), (1.14774395, 7.866256399), (1.023338837, 8.438173832))
            ThreePointArc((1.023338837, 8.438173832), (0.833145693, 8.459070177), (0.642530382, 8.475680191))
            ThreePointArc((0.642530382, 8.475680191), (0.408940123, 7.939022225), (0.277002447, 7.3687954))
            ThreePointArc((0.277002447, 7.3687954), (0.138525669, 7.372698735), (0, 7.374))
        make_face()
    extrude(amount=-BOSS_EXTRUDE4_DEPTH)

    # Sketch15 → Boss-Extrude5 (add)
    with BuildSketch(Plane.ZY.offset(-2.45).offset(BOSS_EXTRUDE5_START)):
        with BuildLine():
            Line((0, 1.125), (0, 0.5))
            ThreePointArc((0, 0.5), (-0.5, 0), (0, -0.5))
            Line((0, -0.5), (0, -1.125))
            ThreePointArc((0, -1.125), (-1.125, 0), (0, 1.125))
        make_face()
    extrude(amount=BOSS_EXTRUDE5_DEPTH)

    # Fillet1
    fillet1_edges = [part.edges().sort_by_distance(p)[0] for p in [
        (13, 0, -1.125),
        (13, 0.707106781, -0.707106781),
        (13, -3.633640599, -1.25),
    ]]
    fillet(fillet1_edges, radius=FILLET1_R - 0.0001)  # a hair under: the kernel refuses the full size


solid = part.part
